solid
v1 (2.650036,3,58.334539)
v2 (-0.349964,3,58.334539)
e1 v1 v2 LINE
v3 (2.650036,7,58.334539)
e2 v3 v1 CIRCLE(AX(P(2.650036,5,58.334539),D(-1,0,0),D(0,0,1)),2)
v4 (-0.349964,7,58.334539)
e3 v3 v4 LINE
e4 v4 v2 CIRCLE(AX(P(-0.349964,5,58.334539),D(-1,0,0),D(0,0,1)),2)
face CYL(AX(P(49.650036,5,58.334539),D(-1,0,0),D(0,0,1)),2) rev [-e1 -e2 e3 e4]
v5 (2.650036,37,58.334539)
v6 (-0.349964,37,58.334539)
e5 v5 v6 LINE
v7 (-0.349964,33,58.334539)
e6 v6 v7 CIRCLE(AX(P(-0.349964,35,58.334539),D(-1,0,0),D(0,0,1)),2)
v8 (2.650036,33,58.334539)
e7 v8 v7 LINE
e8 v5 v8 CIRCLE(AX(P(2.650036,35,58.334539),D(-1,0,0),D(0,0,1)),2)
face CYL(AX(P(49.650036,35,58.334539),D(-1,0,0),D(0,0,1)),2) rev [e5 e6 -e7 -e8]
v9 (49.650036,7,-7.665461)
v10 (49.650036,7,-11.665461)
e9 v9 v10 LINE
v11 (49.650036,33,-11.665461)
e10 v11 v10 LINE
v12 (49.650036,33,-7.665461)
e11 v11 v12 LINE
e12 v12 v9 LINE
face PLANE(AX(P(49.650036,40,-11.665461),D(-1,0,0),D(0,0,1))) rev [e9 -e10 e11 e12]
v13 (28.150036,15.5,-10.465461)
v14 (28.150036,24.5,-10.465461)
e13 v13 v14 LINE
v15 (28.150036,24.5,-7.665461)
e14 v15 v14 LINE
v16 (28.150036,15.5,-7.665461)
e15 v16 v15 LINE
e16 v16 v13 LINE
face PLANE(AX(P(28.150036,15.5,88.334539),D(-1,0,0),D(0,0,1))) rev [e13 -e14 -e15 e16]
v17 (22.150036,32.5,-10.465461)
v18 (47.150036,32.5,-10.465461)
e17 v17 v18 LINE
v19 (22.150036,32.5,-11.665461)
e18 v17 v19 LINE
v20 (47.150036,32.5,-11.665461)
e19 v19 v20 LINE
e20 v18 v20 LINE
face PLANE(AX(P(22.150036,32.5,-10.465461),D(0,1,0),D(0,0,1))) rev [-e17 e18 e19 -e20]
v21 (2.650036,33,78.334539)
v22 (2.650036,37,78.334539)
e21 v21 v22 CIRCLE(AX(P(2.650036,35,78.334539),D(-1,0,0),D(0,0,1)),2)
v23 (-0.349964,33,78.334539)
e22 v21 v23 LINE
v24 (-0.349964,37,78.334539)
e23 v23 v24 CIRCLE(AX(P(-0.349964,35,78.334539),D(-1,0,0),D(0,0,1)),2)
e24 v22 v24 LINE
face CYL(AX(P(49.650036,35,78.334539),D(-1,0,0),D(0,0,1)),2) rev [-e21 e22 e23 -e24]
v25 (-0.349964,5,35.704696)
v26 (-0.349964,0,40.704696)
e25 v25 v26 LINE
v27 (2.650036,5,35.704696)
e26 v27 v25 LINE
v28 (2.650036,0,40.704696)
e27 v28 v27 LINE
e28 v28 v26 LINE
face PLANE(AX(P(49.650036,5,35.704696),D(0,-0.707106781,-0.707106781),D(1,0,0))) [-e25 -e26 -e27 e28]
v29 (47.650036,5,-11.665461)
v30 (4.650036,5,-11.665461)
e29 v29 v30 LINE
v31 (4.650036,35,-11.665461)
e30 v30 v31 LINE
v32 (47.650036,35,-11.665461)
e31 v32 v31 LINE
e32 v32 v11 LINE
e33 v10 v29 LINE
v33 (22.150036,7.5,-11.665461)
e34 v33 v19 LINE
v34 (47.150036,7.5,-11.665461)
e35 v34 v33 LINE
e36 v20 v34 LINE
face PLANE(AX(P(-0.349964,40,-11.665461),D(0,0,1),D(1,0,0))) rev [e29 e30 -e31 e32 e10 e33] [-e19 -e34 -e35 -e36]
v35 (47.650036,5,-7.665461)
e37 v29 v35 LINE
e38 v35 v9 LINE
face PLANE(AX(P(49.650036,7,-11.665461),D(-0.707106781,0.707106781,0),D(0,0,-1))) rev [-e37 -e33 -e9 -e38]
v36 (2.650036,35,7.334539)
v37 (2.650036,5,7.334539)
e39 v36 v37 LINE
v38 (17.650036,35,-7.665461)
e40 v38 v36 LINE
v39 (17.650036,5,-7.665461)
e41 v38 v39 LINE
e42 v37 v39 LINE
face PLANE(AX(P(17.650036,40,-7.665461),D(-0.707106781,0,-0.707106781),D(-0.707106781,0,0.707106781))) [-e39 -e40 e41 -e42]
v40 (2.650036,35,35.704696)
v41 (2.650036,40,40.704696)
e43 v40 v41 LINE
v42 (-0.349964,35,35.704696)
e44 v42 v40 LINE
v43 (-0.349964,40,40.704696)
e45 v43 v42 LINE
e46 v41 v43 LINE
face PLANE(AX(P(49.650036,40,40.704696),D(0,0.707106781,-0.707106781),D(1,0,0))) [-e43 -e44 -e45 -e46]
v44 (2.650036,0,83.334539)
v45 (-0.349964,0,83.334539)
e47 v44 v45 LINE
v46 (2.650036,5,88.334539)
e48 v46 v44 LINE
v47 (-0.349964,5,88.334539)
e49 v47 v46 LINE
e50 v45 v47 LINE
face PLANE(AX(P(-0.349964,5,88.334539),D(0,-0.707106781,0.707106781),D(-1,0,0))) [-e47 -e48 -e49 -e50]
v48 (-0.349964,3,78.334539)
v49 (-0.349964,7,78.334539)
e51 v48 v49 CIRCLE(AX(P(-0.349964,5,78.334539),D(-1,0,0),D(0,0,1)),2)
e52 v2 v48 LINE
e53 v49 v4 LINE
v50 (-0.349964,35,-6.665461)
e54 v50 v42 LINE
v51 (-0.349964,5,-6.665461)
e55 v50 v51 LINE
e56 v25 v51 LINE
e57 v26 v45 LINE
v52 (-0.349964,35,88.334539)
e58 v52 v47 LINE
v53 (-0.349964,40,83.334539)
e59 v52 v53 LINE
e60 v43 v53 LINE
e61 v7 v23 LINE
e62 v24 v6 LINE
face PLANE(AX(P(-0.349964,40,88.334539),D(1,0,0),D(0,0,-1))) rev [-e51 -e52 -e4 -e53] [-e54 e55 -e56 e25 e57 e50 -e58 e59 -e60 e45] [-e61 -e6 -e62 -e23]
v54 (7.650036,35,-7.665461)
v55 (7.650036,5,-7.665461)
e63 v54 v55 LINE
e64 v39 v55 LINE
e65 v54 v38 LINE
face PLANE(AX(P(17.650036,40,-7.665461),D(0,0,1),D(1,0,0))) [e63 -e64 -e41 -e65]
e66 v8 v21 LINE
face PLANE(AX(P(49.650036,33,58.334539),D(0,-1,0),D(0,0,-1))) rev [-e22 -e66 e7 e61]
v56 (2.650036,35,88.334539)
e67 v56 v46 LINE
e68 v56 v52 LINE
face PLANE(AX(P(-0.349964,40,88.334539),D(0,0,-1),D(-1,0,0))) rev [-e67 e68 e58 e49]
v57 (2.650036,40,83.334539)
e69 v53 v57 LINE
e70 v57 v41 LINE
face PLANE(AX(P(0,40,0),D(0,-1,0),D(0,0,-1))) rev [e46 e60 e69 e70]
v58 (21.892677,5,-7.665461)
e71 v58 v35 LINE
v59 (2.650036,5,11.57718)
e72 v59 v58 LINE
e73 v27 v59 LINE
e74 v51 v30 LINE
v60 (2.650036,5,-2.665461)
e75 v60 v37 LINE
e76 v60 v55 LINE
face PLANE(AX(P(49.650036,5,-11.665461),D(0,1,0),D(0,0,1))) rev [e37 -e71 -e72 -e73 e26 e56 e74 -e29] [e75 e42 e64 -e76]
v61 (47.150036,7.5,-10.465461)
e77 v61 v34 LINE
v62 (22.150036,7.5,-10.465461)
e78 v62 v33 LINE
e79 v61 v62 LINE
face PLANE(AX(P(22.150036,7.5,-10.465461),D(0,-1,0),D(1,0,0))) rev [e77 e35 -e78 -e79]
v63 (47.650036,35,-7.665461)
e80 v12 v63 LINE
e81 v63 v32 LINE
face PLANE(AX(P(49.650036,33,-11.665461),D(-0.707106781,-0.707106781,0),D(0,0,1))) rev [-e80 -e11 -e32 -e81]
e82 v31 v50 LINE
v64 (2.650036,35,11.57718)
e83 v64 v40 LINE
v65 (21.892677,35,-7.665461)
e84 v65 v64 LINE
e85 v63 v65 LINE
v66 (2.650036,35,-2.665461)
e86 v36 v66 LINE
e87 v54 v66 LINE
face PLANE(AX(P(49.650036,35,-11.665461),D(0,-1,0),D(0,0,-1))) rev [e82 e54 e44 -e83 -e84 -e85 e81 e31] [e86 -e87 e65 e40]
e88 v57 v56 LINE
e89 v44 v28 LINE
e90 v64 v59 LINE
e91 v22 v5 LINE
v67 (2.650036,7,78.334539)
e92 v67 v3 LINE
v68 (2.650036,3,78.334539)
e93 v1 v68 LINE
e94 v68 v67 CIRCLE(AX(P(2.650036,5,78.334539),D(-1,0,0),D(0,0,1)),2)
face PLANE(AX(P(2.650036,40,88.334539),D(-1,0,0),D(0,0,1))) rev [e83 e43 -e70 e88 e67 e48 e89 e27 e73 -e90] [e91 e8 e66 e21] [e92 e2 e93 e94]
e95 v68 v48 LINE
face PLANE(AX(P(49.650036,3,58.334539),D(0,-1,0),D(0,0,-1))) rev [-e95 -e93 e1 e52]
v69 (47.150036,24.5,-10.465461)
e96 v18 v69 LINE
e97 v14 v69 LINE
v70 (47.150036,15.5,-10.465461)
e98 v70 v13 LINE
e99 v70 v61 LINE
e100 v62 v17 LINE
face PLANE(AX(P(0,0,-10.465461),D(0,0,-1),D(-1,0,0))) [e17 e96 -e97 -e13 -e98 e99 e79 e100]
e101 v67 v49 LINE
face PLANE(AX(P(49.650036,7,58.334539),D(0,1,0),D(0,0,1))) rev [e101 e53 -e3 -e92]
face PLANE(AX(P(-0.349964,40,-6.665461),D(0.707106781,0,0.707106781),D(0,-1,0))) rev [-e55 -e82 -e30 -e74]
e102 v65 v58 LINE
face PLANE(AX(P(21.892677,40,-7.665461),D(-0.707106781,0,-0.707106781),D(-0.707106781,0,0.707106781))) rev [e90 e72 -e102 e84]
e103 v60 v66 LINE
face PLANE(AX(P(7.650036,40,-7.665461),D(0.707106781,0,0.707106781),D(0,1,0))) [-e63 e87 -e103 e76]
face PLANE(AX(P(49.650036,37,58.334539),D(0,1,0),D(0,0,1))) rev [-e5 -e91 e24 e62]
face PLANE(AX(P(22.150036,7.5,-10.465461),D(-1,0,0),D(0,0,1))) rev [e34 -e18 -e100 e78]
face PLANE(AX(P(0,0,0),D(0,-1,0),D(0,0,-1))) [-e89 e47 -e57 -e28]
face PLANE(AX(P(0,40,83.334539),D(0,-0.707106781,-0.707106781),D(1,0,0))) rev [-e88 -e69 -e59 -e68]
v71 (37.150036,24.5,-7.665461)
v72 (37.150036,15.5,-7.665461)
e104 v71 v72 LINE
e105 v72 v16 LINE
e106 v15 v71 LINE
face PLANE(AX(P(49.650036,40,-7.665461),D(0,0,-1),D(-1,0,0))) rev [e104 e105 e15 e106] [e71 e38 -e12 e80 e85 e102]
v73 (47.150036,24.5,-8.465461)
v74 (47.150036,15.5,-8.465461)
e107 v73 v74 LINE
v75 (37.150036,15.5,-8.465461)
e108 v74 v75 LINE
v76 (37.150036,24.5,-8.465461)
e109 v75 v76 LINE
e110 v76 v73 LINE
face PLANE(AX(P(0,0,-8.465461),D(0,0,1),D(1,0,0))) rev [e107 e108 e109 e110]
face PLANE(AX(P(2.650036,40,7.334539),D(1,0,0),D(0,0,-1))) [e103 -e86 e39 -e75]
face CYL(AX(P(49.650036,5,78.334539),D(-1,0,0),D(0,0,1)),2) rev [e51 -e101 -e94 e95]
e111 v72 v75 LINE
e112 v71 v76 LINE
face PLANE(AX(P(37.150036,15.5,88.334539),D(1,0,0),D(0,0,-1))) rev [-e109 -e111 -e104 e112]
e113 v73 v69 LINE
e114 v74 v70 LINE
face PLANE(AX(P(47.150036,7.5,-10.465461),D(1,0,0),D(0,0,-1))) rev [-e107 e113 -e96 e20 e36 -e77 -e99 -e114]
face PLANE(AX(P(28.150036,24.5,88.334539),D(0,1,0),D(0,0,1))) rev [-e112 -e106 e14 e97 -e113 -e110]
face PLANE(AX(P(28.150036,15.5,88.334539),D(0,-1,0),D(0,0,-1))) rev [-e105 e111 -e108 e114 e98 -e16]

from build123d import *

# Parameters (mm, degrees)
SALIENTE_EXTRUIR1_DEPTH = 40
CORTAR_EXTRUIR1_DEPTH   = 110.100828683
CHAFL_N1_SIZE           = 5
CROQUIS3_W              = 52.370156311
CROQUIS3_H              = 5
CORTAR_EXTRUIR2_DEPTH   = 110.100828683
CHAFL_N2_SIZE           = 5
CROQUIS4_W              = 25
CROQUIS4_H              = 25
CORTAR_EXTRUIR3_DEPTH   = 1.2
CROQUIS5_W              = 9
CROQUIS5_H              = 9
CORTAR_EXTRUIR4_DEPTH   = 118.586419677
CROQUIS6_W              = 10
CROQUIS6_H              = 9
CORTAR_EXTRUIR5_DEPTH   = 2
CHAFL_N5_SIZE           = 2
CHAFL_N6_SIZE           = 5


with BuildPart() as part:
    # Croquis1 → Saliente-Extruir1 (new body)
    with BuildSketch(Plane(origin=(0, 0, 0), x_dir=(1, 0, 0), z_dir=(0, 1, 0))):
        Polygon((-0.349963823, 11.66546078), (49.650036177, 11.66546078), (49.650036177, 7.66546078), (21.892676864, 7.66546078), (2.650036177, -11.577179907), (2.650036177, -88.33453922), (-0.349963823, -88.33453922), align=None)
        Polygon((17.650036177, 7.66546078), (2.650036177, -7.33453922), (2.650036177, 7.66546078), align=None, mode=Mode.SUBTRACT)
    extrude(amount=SALIENTE_EXTRUIR1_DEPTH)

    # Croquis2 → Cortar-Extruir1 (cut, through all)
    with BuildSketch(Plane.ZY.offset(0.349963823)):
        with BuildLine():
            Line((58.33453922, 37), (78.33453922, 37))
            ThreePointArc((78.33453922, 37), (80.33453922, 35), (78.33453922, 33))
            Line((78.33453922, 33), (58.33453922, 33))
            ThreePointArc((58.33453922, 33), (56.33453922, 35), (58.33453922, 37))
        make_face()
        with BuildLine():
            Line((58.33453922, 7), (78.33453922, 7))
            ThreePointArc((78.33453922, 7), (80.33453922, 5), (78.33453922, 3))
            Line((78.33453922, 3), (58.33453922, 3))
            ThreePointArc((58.33453922, 3), (56.33453922, 5), (58.33453922, 7))
        make_face()
    extrude(amount=-CORTAR_EXTRUIR1_DEPTH, mode=Mode.SUBTRACT)

    # Chaflán1
    chafl_n1_edges = [part.edges().sort_by_distance(p)[0] for p in [
        (-0.349963823, 20, -11.66546078),
        (2.650036177, 20, -7.66546078),
    ]]
    chamfer(chafl_n1_edges, length=CHAFL_N1_SIZE)

    # Croquis3 → Cortar-Extruir2 (cut, through all)
    with BuildSketch(Plane.ZY.offset(0.349963823)):
        with Locations((14.519617376, 2.5)):
            Rectangle(CROQUIS3_W, CROQUIS3_H)
        with Locations((14.519617376, 37.5)):
            Rectangle(CROQUIS3_W, CROQUIS3_H)
    extrude(amount=-CORTAR_EXTRUIR2_DEPTH, mode=Mode.SUBTRACT)

    # Chaflán2
    chafl_n2_edges = [part.edges().sort_by_distance(p)[0] for p in [
        (1.150036177, 35, 40.704695531),
        (1.150036177, 5, 40.704695531),
    ]]
    chamfer(chafl_n2_edges, length=CHAFL_N2_SIZE - 0.0001)  # a hair under: the kernel refuses the full size

    # Croquis4 → Cortar-Extruir3 (cut)
    with BuildSketch(Plane(origin=(0, 0, -11.66546078), x_dir=(-1, 0, 0), z_dir=(0, 0, -1))):
        with Locations((-34.650036177, 20)):
            Rectangle(CROQUIS4_W, CROQUIS4_H)
    extrude(amount=-CORTAR_EXTRUIR3_DEPTH, mode=Mode.SUBTRACT)

    # Croquis5 → Cortar-Extruir4 (cut, through all)
    with BuildSketch(Plane(origin=(0, 0, -10.46546078), x_dir=(-1, 0, 0), z_dir=(0, 0, -1))):
        with Locations((-32.650036177, 20)):
            Rectangle(CROQUIS5_W, CROQUIS5_H)
    extrude(amount=-CORTAR_EXTRUIR4_DEPTH, mode=Mode.SUBTRACT)

    # Croquis6 → Cortar-Extruir5 (cut)
    with BuildSketch(Plane(origin=(0, 0, -10.46546078), x_dir=(-1, 0, 0), z_dir=(0, 0, -1))):
        with Locations((-42.150036177, 20)):
            Rectangle(CROQUIS6_W, CROQUIS6_H)
    extrude(amount=-CORTAR_EXTRUIR5_DEPTH, mode=Mode.SUBTRACT)

    # Chaflán5
    chafl_n5_edges = [part.edges().sort_by_distance(p)[0] for p in [
        (49.650036177, 5, -9.66546078),
        (49.650036177, 35, -9.66546078),
    ]]
    chamfer(chafl_n5_edges, length=CHAFL_N5_SIZE)

    # Chaflán6
    chafl_n6_edges = [part.edges().sort_by_distance(p)[0] for p in [
        (1.150036177, 40, 88.33453922),
        (1.150036177, 0, 88.33453922),
    ]]
    chamfer(chafl_n6_edges, length=CHAFL_N6_SIZE)


solid = part.part
